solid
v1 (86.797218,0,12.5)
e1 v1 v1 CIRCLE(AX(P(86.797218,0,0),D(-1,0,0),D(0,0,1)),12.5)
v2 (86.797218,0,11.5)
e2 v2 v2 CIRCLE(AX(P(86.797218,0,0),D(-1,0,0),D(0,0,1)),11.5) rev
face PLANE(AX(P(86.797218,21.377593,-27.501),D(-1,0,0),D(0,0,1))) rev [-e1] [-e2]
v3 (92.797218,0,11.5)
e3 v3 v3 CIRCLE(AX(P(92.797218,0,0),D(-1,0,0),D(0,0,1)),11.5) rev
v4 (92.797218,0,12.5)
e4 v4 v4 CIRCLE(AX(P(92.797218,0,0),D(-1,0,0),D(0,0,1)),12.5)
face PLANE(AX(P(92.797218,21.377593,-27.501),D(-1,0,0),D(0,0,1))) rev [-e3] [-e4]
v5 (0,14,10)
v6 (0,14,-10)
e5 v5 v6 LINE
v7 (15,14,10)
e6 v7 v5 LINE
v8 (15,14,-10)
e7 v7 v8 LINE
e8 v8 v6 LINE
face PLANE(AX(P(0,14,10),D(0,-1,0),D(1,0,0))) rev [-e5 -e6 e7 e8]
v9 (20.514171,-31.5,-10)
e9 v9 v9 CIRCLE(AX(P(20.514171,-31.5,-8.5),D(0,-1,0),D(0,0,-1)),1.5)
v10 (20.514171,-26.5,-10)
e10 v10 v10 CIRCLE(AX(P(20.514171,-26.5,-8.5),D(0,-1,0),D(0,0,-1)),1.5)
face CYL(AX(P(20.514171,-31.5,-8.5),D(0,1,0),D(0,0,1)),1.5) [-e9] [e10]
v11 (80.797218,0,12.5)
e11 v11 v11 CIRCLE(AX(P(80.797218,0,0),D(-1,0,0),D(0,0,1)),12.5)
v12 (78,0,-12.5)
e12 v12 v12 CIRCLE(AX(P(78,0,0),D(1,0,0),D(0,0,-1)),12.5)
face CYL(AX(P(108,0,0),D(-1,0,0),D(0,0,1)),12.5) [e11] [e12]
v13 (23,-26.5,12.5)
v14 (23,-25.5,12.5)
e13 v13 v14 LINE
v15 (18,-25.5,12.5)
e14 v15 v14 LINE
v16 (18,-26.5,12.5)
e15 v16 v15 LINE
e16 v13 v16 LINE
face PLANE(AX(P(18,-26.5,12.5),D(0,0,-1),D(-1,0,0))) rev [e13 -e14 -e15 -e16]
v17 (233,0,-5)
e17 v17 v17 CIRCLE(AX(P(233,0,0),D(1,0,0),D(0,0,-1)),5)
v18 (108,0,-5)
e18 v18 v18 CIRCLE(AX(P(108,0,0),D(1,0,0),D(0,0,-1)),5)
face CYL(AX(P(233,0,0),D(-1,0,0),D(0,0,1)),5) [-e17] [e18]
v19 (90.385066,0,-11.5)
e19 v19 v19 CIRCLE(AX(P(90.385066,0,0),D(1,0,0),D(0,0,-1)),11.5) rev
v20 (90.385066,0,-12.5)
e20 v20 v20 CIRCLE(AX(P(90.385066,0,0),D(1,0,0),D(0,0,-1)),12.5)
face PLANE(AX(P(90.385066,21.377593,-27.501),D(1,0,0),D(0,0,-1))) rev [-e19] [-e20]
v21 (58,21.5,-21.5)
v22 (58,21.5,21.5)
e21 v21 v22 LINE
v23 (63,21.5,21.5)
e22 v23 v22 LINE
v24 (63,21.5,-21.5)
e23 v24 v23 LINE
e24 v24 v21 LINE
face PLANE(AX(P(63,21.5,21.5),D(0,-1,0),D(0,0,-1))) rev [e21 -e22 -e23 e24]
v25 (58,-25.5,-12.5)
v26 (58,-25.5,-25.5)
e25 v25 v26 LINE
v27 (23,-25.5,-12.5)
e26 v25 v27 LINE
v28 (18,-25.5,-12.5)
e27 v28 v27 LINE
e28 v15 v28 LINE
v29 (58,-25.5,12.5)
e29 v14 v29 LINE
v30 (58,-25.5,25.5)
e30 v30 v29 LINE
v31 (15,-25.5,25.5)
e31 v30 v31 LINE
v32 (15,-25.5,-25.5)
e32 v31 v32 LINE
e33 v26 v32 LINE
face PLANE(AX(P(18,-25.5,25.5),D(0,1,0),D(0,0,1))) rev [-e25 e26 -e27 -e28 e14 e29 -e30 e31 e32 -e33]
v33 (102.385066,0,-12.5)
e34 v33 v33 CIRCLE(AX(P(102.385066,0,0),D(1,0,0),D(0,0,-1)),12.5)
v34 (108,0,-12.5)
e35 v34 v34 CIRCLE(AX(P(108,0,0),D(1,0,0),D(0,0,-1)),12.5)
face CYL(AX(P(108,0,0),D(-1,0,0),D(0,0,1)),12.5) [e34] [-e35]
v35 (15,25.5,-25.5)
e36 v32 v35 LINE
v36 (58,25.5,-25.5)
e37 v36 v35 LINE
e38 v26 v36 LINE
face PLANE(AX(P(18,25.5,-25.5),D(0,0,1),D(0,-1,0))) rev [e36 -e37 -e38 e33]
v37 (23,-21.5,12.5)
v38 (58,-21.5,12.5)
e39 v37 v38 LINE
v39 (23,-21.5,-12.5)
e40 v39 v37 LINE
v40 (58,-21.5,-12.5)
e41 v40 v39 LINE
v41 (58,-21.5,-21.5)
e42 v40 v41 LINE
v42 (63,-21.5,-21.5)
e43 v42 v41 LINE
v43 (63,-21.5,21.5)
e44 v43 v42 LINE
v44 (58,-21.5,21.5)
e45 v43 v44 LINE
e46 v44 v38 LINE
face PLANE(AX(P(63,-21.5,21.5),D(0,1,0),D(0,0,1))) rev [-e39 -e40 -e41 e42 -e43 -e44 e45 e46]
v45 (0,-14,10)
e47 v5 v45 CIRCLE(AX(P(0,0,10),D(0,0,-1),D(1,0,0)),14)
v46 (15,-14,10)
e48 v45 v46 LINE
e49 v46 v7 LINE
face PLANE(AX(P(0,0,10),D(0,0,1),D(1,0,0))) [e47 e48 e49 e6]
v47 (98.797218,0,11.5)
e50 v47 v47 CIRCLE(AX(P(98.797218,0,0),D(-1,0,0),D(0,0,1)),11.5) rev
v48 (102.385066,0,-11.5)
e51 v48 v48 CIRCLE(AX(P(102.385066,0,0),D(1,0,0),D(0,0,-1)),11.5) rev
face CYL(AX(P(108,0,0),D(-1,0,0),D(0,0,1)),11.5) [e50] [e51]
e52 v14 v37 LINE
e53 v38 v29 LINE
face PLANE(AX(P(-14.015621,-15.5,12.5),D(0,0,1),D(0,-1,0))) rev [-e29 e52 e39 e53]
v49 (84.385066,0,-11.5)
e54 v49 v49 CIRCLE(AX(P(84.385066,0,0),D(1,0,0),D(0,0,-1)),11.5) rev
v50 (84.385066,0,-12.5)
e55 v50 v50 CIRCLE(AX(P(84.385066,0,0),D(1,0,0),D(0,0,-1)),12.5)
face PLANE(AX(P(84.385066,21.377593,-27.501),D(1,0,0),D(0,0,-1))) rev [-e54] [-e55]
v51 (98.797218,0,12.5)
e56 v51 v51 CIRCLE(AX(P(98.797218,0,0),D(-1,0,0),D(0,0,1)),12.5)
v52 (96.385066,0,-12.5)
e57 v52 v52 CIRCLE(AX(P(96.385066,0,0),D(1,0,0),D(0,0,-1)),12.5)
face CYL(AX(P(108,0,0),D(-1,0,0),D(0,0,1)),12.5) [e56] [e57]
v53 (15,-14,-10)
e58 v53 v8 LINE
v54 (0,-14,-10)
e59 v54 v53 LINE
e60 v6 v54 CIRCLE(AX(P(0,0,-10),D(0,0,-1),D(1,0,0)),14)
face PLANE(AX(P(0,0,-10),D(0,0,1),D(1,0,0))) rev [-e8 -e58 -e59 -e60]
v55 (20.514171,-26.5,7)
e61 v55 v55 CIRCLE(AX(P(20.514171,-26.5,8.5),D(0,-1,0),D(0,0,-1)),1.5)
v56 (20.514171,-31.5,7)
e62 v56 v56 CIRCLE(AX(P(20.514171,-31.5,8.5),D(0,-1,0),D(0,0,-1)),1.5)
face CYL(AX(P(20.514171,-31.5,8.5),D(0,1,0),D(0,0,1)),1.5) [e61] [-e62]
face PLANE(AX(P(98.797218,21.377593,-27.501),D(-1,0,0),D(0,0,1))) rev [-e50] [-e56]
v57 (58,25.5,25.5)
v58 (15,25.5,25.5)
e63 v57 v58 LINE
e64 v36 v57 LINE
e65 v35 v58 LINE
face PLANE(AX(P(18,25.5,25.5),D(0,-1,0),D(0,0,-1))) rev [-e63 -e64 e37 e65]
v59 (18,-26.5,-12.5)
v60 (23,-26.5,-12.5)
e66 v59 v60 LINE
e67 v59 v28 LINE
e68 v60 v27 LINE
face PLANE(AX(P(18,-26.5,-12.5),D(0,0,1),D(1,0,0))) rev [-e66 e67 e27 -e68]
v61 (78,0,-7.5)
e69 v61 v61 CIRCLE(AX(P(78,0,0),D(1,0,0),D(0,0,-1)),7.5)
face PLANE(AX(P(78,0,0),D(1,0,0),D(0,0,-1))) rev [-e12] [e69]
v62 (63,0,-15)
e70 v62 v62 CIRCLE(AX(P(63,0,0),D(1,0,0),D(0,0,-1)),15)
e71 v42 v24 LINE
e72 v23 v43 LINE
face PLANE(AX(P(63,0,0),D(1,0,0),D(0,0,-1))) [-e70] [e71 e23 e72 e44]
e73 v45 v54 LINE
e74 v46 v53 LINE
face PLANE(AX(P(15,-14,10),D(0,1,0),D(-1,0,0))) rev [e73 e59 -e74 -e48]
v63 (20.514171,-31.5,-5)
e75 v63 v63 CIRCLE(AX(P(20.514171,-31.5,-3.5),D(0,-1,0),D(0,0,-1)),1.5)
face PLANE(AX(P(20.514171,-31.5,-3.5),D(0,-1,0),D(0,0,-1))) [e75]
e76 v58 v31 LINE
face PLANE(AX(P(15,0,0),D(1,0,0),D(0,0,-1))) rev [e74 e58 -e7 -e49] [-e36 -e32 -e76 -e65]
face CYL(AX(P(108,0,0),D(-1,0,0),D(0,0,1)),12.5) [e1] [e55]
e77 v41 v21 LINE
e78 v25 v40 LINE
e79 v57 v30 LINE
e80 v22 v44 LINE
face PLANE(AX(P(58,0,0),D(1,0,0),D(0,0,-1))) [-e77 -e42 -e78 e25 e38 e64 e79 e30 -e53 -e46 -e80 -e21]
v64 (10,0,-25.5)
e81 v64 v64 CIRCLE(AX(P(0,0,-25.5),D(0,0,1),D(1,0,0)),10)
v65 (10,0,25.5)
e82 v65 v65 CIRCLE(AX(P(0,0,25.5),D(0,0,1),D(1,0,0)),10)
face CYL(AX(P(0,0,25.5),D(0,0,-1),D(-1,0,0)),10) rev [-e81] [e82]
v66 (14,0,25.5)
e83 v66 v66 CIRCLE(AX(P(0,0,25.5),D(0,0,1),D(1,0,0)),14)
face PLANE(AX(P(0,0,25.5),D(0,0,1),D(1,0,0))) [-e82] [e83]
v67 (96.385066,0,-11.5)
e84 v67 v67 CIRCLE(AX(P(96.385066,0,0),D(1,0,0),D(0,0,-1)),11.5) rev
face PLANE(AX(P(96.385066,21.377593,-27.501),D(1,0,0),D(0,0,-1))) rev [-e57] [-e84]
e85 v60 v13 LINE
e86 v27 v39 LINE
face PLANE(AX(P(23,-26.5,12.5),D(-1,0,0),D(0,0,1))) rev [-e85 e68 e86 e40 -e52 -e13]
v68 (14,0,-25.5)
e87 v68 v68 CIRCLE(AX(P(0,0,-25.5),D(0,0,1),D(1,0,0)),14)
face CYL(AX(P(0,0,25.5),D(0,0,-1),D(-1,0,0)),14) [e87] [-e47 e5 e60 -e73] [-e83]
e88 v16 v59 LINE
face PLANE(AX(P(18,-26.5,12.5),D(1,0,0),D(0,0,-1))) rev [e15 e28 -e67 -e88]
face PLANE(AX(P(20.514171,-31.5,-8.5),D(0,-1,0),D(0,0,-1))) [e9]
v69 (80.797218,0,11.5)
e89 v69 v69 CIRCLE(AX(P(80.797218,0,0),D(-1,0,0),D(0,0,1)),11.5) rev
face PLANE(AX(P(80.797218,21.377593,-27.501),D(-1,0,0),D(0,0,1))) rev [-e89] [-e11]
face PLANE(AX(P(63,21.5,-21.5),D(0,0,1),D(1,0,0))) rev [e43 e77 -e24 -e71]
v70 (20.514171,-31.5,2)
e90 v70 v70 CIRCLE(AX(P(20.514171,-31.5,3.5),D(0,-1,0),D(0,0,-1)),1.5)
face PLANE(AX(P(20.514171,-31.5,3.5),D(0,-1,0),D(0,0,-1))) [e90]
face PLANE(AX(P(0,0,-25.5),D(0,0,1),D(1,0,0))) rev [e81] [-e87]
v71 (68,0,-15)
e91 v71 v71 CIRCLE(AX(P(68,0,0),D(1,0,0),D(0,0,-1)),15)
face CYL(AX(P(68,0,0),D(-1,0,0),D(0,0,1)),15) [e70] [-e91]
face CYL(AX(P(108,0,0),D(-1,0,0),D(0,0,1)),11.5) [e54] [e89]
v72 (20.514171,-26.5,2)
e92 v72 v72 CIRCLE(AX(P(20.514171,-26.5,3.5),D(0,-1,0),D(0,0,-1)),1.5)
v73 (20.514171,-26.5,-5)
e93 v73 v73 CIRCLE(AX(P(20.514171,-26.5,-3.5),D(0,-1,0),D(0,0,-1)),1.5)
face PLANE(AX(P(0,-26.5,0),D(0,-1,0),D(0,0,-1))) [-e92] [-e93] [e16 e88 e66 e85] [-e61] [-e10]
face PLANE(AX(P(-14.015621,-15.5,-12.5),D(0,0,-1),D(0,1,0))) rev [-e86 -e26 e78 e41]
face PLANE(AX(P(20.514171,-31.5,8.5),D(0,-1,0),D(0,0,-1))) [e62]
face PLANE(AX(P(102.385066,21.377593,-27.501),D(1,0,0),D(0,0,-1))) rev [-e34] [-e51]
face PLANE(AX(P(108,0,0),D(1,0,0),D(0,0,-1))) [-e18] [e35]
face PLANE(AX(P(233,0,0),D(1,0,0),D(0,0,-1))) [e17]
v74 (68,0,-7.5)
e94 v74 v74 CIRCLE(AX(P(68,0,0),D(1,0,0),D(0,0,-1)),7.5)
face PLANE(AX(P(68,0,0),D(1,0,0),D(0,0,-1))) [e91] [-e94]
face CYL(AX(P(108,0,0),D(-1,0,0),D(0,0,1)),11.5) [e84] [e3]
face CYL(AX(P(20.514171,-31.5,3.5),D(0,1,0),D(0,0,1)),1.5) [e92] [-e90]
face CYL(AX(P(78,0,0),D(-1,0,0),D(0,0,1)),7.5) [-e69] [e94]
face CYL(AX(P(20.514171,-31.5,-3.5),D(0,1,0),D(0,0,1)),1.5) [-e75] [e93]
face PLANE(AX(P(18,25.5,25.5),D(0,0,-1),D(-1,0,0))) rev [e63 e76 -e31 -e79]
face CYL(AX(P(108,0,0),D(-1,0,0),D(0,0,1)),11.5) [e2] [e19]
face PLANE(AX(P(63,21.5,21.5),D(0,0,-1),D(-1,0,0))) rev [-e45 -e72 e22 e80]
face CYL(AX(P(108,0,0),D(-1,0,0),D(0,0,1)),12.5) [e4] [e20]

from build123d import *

# Parameters (mm, degrees)
SKETCH2_R               = 14
SKETCH2_R_2             = 10
EXTRUDE1_DEPTH          = 25.5
EXTRUDE2_DEPTH          = 10
SKETCH4_W               = 51
SKETCH4_H               = 51
EXTRUDE3_DEPTH          = 3
SKETCH5_W               = 51
SKETCH5_H               = 51
SKETCH5_W_2             = 43
SKETCH5_H_2             = 43
EXTRUDE4_DEPTH          = 40
SKETCH8_W               = 25
SKETCH8_H               = 20
EXTRUDE8_DEPTH          = 40
SKETCH10_W              = 43
SKETCH10_H              = 43
EXTRUDE10_DEPTH         = 45
SKETCH11_R              = 15
EXTRUDE11_DEPTH         = 5
SKETCH12_W              = 5
SKETCH12_H              = 25
EXTRUDE12_DEPTH         = 5
SKETCH13_R              = 1.5
EXTRUDE13_DEPTH         = 5
SKETCH14_R              = 7.5
EXTRUDE14_DEPTH         = 10
SKETCH15_R              = 12.5
EXTRUDE15_DEPTH         = 30
SKETCH16_R              = 5
EXTRUDE16_DEPTH         = 125
EXTRUDE17_START         = 80.797218397
EXTRUDE17_OUTLINE_R     = 12.5
EXTRUDE17_OUTLINE_R_2   = 11.5
EXTRUDE17_DEPTH         = 3.587847701
EXTRUDE17_START_2       = 86.797218397
EXTRUDE17_2_OUTLINE_R   = 12.5
EXTRUDE17_2_OUTLINE_R_2 = 11.5
EXTRUDE17_2_DEPTH       = 3.587847701
EXTRUDE17_START_3       = 92.797218397
EXTRUDE17_3_OUTLINE_R   = 12.5
EXTRUDE17_3_OUTLINE_R_2 = 11.5
EXTRUDE17_3_DEPTH       = 3.587847701
EXTRUDE17_START_4       = 98.797218397
EXTRUDE17_4_OUTLINE_R   = 12.5
EXTRUDE17_4_OUTLINE_R_2 = 11.5
EXTRUDE17_4_DEPTH       = 3.587847701


# Read off the part's stored shape, not the designer's step: Extrude17
with BuildPart() as part:
    # Sketch2 → Extrude1 (new, symmetric)
    with BuildSketch(Plane.XY):
        Circle(SKETCH2_R)
        Circle(SKETCH2_R_2, mode=Mode.SUBTRACT)
    extrude(amount=EXTRUDE1_DEPTH, both=True)

    # Sketch3 → Extrude2 (add, symmetric)
    with BuildSketch(Plane.XY):
        with BuildLine():
            Line((0, 14), (15, 14))
            Line((15, 14), (15, -14))
            Line((15, -14), (0, -14))
            ThreePointArc((0, -14), (14, 0), (0, 14))
        make_face()
    extrude(amount=EXTRUDE2_DEPTH, both=True)

    # Sketch4 → Extrude3 (add)
    with BuildSketch(Plane(origin=(15, 0, 0), x_dir=(0, 0, -1), z_dir=(1, 0, 0))):
        Rectangle(SKETCH4_W, SKETCH4_H)
    extrude(amount=EXTRUDE3_DEPTH)

    # Sketch5 → Extrude4 (add)
    with BuildSketch(Plane(origin=(18, 0, 0), x_dir=(0, 0, -1), z_dir=(1, 0, 0))):
        Rectangle(SKETCH5_W, SKETCH5_H)
        Rectangle(SKETCH5_W_2, SKETCH5_H_2, mode=Mode.SUBTRACT)
    extrude(amount=EXTRUDE4_DEPTH)

    # Sketch8 → Extrude8 (cut)
    with BuildSketch(Plane(origin=(58, 0, 0), x_dir=(0, 0, -1), z_dir=(1, 0, 0))):
        with Locations((0, -25.5)):
            Rectangle(SKETCH8_W, SKETCH8_H)
    extrude(amount=-EXTRUDE8_DEPTH, mode=Mode.SUBTRACT)

    # Sketch10 → Extrude10 (add)
    with BuildSketch(Plane(origin=(18, 0, 0), x_dir=(0, 0, -1), z_dir=(1, 0, 0))):
        Rectangle(SKETCH10_W, SKETCH10_H)
    extrude(amount=EXTRUDE10_DEPTH)

    # Sketch11 → Extrude11 (add)
    with BuildSketch(Plane(origin=(63, 0, 0), x_dir=(0, 0, -1), z_dir=(1, 0, 0))):
        Circle(SKETCH11_R)
    extrude(amount=EXTRUDE11_DEPTH)

    # Sketch12 → Extrude12 (add)
    with BuildSketch(Plane.XZ.offset(21.5)):
        with Locations((20.5, 0)):
            Rectangle(SKETCH12_W, SKETCH12_H)
    extrude(amount=EXTRUDE12_DEPTH)

    # Sketch13 → Extrude13 (add)
    with BuildSketch(Plane.XZ.offset(26.5)):
        with Locations(Location((20.514171065, 8.5, 0), (0, 0, 270))):
            Circle(SKETCH13_R)
        with Locations(Location((20.514171065, 3.5, 0), (0, 0, 270))):
            Circle(SKETCH13_R)
        with Locations(Location((20.514171065, -3.5, 0), (0, 0, 270))):
            Circle(SKETCH13_R)
        with Locations(Location((20.514171065, -8.5, 0), (0, 0, 270))):
            Circle(SKETCH13_R)
    extrude(amount=EXTRUDE13_DEPTH)

    # Sketch14 → Extrude14 (add)
    with BuildSketch(Plane(origin=(68, 0, 0), x_dir=(0, 0, -1), z_dir=(1, 0, 0))):
        Circle(SKETCH14_R)
    extrude(amount=EXTRUDE14_DEPTH)

    # Sketch15 → Extrude15 (add)
    with BuildSketch(Plane(origin=(78, 0, 0), x_dir=(0, 0, -1), z_dir=(1, 0, 0))):
        Circle(SKETCH15_R)
    extrude(amount=EXTRUDE15_DEPTH)

    # Sketch16 → Extrude16 (add)
    with BuildSketch(Plane(origin=(108, 0, 0), x_dir=(0, 0, -1), z_dir=(1, 0, 0))):
        Circle(SKETCH16_R)
    extrude(amount=EXTRUDE16_DEPTH)

    # Extrude17 outline → Extrude17 (cut)
    with BuildSketch(Plane.YZ.offset(EXTRUDE17_START)):
        Circle(EXTRUDE17_OUTLINE_R)
        Circle(EXTRUDE17_OUTLINE_R_2, mode=Mode.SUBTRACT)
    extrude(amount=EXTRUDE17_DEPTH, mode=Mode.SUBTRACT)

    # Extrude17 2 outline → Extrude17 2 (cut)
    with BuildSketch(Plane.YZ.offset(EXTRUDE17_START_2)):
        Circle(EXTRUDE17_2_OUTLINE_R)
        Circle(EXTRUDE17_2_OUTLINE_R_2, mode=Mode.SUBTRACT)
    extrude(amount=EXTRUDE17_2_DEPTH, mode=Mode.SUBTRACT)

    # Extrude17 3 outline → Extrude17 3 (cut)
    with BuildSketch(Plane.YZ.offset(EXTRUDE17_START_3)):
        Circle(EXTRUDE17_3_OUTLINE_R)
        Circle(EXTRUDE17_3_OUTLINE_R_2, mode=Mode.SUBTRACT)
    extrude(amount=EXTRUDE17_3_DEPTH, mode=Mode.SUBTRACT)

    # Extrude17 4 outline → Extrude17 4 (cut)
    with BuildSketch(Plane.YZ.offset(EXTRUDE17_START_4)):
        Circle(EXTRUDE17_4_OUTLINE_R)
        Circle(EXTRUDE17_4_OUTLINE_R_2, mode=Mode.SUBTRACT)
    extrude(amount=EXTRUDE17_4_DEPTH, mode=Mode.SUBTRACT)


solid = part.part
